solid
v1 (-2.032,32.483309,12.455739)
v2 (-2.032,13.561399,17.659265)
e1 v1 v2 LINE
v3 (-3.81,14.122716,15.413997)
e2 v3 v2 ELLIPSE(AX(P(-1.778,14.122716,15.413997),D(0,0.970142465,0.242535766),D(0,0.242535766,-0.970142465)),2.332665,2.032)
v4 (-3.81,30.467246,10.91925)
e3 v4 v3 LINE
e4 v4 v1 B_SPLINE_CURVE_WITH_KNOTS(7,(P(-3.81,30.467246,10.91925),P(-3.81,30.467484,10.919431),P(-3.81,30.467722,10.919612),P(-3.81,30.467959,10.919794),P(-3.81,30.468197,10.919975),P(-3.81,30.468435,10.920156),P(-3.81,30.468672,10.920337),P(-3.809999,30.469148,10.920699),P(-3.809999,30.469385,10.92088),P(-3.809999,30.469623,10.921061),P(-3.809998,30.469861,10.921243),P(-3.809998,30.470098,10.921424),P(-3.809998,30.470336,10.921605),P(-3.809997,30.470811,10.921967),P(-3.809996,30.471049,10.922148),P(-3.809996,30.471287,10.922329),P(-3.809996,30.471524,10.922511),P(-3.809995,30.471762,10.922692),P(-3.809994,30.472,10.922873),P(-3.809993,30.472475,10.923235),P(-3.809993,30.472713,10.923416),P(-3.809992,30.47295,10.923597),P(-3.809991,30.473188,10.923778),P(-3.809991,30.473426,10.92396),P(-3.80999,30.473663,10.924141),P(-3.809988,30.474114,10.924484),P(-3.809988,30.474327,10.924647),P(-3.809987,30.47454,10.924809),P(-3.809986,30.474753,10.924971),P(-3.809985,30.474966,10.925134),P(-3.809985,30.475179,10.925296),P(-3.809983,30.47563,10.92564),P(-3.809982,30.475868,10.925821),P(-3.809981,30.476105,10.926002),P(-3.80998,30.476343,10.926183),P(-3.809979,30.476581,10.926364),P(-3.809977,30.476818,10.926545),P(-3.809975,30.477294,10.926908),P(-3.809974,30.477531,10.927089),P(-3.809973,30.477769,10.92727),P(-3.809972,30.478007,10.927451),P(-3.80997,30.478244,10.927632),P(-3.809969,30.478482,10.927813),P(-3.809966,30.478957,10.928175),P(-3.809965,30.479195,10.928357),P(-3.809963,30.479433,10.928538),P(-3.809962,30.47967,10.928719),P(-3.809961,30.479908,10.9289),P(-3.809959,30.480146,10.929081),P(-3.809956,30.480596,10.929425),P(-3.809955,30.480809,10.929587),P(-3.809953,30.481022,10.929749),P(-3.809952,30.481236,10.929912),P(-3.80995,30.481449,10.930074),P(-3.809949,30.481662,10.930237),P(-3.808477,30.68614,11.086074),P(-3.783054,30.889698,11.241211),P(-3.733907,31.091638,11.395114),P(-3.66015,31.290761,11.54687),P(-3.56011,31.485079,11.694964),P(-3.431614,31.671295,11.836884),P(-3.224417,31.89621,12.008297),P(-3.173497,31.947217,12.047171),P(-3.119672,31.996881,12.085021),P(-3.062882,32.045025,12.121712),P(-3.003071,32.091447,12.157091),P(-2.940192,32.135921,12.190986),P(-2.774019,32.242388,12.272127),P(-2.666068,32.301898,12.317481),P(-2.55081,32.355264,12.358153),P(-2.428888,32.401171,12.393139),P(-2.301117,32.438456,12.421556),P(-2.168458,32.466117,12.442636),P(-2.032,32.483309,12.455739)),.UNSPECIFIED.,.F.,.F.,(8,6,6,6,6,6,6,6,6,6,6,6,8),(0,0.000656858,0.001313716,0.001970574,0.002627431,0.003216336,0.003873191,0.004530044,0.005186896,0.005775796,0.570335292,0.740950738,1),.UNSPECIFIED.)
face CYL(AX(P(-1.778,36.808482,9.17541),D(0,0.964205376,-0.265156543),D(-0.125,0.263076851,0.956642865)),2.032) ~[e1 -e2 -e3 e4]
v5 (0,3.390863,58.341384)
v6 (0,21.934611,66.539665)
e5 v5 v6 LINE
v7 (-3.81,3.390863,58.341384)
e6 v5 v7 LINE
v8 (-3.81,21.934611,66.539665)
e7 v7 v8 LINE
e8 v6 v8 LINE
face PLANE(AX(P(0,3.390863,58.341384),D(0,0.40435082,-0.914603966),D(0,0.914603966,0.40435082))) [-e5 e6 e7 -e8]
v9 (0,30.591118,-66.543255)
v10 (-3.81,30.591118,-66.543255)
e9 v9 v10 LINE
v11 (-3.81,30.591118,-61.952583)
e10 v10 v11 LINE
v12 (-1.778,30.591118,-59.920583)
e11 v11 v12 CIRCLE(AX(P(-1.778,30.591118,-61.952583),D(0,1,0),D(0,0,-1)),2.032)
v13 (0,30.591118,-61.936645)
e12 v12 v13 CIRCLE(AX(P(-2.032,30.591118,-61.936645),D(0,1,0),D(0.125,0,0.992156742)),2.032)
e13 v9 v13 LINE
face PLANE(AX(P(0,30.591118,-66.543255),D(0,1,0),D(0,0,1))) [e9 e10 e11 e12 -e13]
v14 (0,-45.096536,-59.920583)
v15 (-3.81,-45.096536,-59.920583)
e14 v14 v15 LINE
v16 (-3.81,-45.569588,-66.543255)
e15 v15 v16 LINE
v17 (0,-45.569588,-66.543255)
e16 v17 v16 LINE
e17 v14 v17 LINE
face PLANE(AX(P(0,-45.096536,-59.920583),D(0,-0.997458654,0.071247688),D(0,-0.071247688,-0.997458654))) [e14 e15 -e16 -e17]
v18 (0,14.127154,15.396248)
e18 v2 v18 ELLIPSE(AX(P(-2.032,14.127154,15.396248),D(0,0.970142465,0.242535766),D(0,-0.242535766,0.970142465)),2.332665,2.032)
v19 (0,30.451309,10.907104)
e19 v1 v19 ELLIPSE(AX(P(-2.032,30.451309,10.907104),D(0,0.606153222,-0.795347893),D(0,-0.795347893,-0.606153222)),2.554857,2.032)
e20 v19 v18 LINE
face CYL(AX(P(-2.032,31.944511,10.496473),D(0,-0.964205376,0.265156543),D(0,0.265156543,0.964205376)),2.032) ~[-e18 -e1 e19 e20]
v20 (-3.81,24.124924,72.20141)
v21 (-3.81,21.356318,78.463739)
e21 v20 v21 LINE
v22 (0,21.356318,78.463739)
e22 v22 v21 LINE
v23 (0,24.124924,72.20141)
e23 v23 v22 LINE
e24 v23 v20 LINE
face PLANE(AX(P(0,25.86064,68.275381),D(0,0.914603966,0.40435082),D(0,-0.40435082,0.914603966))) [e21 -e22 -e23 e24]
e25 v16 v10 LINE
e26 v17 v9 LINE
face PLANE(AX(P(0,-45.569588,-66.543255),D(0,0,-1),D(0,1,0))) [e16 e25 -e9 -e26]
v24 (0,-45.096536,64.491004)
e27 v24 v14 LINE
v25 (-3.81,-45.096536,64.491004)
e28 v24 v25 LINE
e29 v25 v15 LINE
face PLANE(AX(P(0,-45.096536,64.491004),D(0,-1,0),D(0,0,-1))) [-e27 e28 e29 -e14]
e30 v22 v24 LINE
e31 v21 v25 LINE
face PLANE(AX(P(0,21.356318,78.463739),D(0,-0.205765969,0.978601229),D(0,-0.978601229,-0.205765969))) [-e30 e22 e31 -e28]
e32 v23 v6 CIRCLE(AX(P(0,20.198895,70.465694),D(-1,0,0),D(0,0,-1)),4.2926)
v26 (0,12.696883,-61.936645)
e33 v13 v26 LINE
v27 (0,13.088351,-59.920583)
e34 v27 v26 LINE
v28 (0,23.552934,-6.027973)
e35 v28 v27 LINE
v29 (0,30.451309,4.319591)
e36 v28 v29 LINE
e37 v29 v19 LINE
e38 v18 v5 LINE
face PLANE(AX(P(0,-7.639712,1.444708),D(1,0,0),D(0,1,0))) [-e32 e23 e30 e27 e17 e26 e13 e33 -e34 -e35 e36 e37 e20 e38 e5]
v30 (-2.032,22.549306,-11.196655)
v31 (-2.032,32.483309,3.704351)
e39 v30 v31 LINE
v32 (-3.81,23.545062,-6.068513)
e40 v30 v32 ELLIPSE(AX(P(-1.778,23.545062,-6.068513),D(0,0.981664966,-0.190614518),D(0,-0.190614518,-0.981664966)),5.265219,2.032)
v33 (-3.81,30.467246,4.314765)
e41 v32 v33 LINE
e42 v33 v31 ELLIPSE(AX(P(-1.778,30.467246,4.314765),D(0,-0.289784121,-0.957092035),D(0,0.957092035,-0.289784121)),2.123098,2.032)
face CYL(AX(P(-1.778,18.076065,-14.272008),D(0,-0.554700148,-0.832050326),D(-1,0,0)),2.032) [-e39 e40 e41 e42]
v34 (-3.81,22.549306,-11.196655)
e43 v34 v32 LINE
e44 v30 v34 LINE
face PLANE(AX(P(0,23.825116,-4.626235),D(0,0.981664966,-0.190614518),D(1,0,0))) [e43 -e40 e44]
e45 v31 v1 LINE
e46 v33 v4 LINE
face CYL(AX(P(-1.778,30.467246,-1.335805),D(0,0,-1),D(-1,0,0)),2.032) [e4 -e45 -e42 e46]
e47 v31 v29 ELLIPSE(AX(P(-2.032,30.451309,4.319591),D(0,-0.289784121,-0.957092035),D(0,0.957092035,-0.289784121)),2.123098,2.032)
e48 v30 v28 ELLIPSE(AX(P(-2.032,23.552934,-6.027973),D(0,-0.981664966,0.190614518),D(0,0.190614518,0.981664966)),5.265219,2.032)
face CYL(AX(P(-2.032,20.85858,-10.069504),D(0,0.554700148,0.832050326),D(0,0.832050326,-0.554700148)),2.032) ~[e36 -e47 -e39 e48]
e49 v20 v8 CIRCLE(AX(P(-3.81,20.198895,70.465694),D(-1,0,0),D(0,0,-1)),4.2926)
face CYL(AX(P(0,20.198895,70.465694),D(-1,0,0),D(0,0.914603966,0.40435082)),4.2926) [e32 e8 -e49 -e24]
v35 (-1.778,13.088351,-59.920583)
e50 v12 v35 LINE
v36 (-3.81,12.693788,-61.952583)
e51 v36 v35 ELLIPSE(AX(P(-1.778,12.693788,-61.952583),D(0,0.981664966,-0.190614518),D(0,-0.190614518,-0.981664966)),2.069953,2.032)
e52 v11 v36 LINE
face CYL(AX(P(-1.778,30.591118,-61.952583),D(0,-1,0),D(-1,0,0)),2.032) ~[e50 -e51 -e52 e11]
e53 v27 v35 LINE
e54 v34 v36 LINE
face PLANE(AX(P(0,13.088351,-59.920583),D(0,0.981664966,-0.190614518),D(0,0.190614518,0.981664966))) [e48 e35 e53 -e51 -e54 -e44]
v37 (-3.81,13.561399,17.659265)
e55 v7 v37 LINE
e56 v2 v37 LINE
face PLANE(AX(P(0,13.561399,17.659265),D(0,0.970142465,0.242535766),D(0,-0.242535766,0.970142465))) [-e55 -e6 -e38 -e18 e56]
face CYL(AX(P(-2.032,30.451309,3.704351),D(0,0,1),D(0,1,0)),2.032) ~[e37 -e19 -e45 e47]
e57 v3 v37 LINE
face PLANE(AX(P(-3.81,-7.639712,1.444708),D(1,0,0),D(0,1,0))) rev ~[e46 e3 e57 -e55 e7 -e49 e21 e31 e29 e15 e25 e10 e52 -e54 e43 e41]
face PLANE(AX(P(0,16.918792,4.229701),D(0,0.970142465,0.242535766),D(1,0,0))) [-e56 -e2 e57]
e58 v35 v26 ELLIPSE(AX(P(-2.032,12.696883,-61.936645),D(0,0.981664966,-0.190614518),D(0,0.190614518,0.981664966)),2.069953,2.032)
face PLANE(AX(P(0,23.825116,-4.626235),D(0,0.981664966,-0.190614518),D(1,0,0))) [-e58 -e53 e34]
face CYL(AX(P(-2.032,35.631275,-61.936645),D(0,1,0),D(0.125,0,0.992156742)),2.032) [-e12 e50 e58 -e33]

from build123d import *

# Parameters (mm, degrees)
F1_DEPTH     = 3.81
F2_R         = 2.032
F3_T1_DEPTH  = 18.831700203
F3_T6_DEPTH  = 29.7046687957
F3_T11_DEPTH = 27.9890917976
F4_R         = 4.2926
F5_R         = 2.032
F6_T4_DEPTH  = 27.583079529


# Not quite as in the source:
# - a fillet or chamfer that OpenCascade refuses, or shapes differently, is made with other operations: its cross-section is extruded or revolved along the edge and cut away or added


with BuildPart() as f1:
    # F0 (on Right) → F1 (new body)
    with BuildSketch(Plane.YZ):
        Polygon((-45.0965359712, 64.4910041714), (-45.0965359712, 37.5272747601), (-45.0965359712, 31.8507016177), (-45.0965359712, -59.9205825006), (-45.5695882344, -66.5432545816), (30.5911183453, -66.5432545816), (30.5911183453, -59.9205825006), (13.0883513114, -59.9205825006), (22.5493062383, -11.1966548016), (32.4833087719, 3.7043508614), (32.4833087719, 12.4557385693), (13.561398918, 17.6592650363), (3.3908628023, 58.3413843537), (25.8606404162, 68.2753812993), (21.3563181986, 78.4637394279), align=None)
    extrude(amount=-F1_DEPTH)

    # F2
    f2_edges = [f1.edges().sort_by_distance(p)[0] for p in [
        (0, 23.022354, 15.057502),
        (0, 27.516308, -3.746152),
        (0, 32.483309, 8.080045),
    ]]
    fillet(f2_edges, radius=F2_R)

    # F3: fillet of radius 2.032 on 3 edges, made by hand

    # F3_s2 → F3_t1 (cut)
    with BuildSketch(Plane.XY.offset(-1.3358053862)):
        with BuildLine():
            ThreePointArc((-3.81, 30.4672462728), (-3.302, 31.8112879389), (-2.032, 32.4833087719))
            Line((-2.032, 32.4833087719), (-2.03708, 32.5236300218))
            ThreePointArc((-2.03708, 32.5236300218), (-2.921, 32.5239487719), (-3.81, 32.5239487719))
            Line((-3.81, 32.5239487719), (-3.85064, 32.4833087719))
            Line((-3.85064, 32.4833087719), (-3.85064, 30.4672462728))
            Line((-3.85064, 30.4672462728), (-3.81, 30.4672462728))
        make_face()
    extrude(amount=F3_T1_DEPTH, mode=Mode.SUBTRACT)


with BuildPart() as f3_tool4:
    # F3_s5 → F3_t6 (new body)
    with BuildSketch(Plane(origin=(0, 31.8747173735, -8.7655493956), x_dir=(1, 0, 0), z_dir=(0, -0.9642053764, 0.2651565426))):
        with BuildLine():
            ThreePointArc((-2.032, 20.6230519415), (-3.302, 19.9510311084), (-3.81, 18.6069894424))
            Line((-3.81, 18.6069894424), (-3.85064, 18.6069894424))
            Line((-3.85064, 18.6069894424), (-3.85064, 20.6230519415))
            Line((-3.85064, 20.6230519415), (-3.81, 20.6636919415))
            ThreePointArc((-3.81, 20.6636919415), (-2.921, 20.6636919415), (-2.03708, 20.6633731914))
            Line((-2.03708, 20.6633731914), (-2.032, 20.6230519415))
        make_face()
    extrude(amount=F3_T6_DEPTH)

    split(bisect_by=Plane(origin=(0, 16.9187920929, 4.2297006376), x_dir=(1, 0, 0), z_dir=(0, 0.9701424649, 0.2425357661)), keep=Keep.TOP)


with BuildPart() as f1_1:
    add(f1.part)

    # F3_t3: cut F3_tool4
    add(f3_tool4.part, mode=Mode.SUBTRACT)


with BuildPart() as f3_tool9:
    # F3_s10 → F3_t11 (new body)
    with BuildSketch(Plane(origin=(0, -1.0252151282, -1.5378228845), x_dir=(1, 0, 0), z_dir=(0, 0.5547001482, 0.8320503263))):
        with BuildLine():
            ThreePointArc((-3.81, 22.9568811933), (-3.302, 24.3009228594), (-2.032, 24.9729436924))
            Line((-2.032, 24.9729436924), (-2.03708, 25.0132649423))
            ThreePointArc((-2.03708, 25.0132649423), (-2.921, 25.0135836924), (-3.81, 25.0135836924))
            Line((-3.81, 25.0135836924), (-3.85064, 24.9729436924))
            Line((-3.85064, 24.9729436924), (-3.85064, 22.9568811933))
            Line((-3.85064, 22.9568811933), (-3.81, 22.9568811933))
        make_face()
    extrude(amount=F3_T11_DEPTH)

    split(bisect_by=Plane(origin=(0, 23.8251156296, -4.6262351117), x_dir=(1, 0, 0), z_dir=(0, 0.981664966, -0.1906145181)), keep=Keep.TOP)


with BuildPart() as f1_2:
    add(f1_1.part)

    # F3_t8: cut F3_tool9
    add(f3_tool9.part, mode=Mode.SUBTRACT)

    # F4
    f4_edges = [f1_2.edges().sort_by_distance(p)[0] for p in [
        (-1.905, 25.86064, 68.275381),
    ]]
    fillet(f4_edges, radius=F4_R)

    # F5
    f5_edges = [f1_2.edges().sort_by_distance(p)[0] for p in [
        (-3.81, 21.839735, -59.920583),
    ]]
    fillet(f5_edges, radius=F5_R)

    # F6: fillet of radius 2.032 on 1 edges, made by hand


with BuildPart() as f6_tool2:
    # F6_s3 → F6_t4 (new body)
    with BuildSketch(Plane.XZ.offset(-35.6312745929)):
        with BuildLine():
            ThreePointArc((-1.778, -59.9205825006), (-0.508, -60.5926033336), (0, -61.9366449997))
            Line((0, -61.9366449997), (0, -59.9205825006))
            Line((0, -59.9205825006), (-1.778, -59.9205825006))
        make_face()
    extrude(amount=F6_T4_DEPTH)

    split(bisect_by=Plane(origin=(0, 23.8251156296, -4.6262351117), x_dir=(1, 0, 0), z_dir=(0, 0.981664966, -0.1906145181)), keep=Keep.TOP)


with BuildPart() as f1_3:
    add(f1_2.part)

    # F6_t1: cut F6_tool2
    add(f6_tool2.part, mode=Mode.SUBTRACT)


solid = f1_3.part
